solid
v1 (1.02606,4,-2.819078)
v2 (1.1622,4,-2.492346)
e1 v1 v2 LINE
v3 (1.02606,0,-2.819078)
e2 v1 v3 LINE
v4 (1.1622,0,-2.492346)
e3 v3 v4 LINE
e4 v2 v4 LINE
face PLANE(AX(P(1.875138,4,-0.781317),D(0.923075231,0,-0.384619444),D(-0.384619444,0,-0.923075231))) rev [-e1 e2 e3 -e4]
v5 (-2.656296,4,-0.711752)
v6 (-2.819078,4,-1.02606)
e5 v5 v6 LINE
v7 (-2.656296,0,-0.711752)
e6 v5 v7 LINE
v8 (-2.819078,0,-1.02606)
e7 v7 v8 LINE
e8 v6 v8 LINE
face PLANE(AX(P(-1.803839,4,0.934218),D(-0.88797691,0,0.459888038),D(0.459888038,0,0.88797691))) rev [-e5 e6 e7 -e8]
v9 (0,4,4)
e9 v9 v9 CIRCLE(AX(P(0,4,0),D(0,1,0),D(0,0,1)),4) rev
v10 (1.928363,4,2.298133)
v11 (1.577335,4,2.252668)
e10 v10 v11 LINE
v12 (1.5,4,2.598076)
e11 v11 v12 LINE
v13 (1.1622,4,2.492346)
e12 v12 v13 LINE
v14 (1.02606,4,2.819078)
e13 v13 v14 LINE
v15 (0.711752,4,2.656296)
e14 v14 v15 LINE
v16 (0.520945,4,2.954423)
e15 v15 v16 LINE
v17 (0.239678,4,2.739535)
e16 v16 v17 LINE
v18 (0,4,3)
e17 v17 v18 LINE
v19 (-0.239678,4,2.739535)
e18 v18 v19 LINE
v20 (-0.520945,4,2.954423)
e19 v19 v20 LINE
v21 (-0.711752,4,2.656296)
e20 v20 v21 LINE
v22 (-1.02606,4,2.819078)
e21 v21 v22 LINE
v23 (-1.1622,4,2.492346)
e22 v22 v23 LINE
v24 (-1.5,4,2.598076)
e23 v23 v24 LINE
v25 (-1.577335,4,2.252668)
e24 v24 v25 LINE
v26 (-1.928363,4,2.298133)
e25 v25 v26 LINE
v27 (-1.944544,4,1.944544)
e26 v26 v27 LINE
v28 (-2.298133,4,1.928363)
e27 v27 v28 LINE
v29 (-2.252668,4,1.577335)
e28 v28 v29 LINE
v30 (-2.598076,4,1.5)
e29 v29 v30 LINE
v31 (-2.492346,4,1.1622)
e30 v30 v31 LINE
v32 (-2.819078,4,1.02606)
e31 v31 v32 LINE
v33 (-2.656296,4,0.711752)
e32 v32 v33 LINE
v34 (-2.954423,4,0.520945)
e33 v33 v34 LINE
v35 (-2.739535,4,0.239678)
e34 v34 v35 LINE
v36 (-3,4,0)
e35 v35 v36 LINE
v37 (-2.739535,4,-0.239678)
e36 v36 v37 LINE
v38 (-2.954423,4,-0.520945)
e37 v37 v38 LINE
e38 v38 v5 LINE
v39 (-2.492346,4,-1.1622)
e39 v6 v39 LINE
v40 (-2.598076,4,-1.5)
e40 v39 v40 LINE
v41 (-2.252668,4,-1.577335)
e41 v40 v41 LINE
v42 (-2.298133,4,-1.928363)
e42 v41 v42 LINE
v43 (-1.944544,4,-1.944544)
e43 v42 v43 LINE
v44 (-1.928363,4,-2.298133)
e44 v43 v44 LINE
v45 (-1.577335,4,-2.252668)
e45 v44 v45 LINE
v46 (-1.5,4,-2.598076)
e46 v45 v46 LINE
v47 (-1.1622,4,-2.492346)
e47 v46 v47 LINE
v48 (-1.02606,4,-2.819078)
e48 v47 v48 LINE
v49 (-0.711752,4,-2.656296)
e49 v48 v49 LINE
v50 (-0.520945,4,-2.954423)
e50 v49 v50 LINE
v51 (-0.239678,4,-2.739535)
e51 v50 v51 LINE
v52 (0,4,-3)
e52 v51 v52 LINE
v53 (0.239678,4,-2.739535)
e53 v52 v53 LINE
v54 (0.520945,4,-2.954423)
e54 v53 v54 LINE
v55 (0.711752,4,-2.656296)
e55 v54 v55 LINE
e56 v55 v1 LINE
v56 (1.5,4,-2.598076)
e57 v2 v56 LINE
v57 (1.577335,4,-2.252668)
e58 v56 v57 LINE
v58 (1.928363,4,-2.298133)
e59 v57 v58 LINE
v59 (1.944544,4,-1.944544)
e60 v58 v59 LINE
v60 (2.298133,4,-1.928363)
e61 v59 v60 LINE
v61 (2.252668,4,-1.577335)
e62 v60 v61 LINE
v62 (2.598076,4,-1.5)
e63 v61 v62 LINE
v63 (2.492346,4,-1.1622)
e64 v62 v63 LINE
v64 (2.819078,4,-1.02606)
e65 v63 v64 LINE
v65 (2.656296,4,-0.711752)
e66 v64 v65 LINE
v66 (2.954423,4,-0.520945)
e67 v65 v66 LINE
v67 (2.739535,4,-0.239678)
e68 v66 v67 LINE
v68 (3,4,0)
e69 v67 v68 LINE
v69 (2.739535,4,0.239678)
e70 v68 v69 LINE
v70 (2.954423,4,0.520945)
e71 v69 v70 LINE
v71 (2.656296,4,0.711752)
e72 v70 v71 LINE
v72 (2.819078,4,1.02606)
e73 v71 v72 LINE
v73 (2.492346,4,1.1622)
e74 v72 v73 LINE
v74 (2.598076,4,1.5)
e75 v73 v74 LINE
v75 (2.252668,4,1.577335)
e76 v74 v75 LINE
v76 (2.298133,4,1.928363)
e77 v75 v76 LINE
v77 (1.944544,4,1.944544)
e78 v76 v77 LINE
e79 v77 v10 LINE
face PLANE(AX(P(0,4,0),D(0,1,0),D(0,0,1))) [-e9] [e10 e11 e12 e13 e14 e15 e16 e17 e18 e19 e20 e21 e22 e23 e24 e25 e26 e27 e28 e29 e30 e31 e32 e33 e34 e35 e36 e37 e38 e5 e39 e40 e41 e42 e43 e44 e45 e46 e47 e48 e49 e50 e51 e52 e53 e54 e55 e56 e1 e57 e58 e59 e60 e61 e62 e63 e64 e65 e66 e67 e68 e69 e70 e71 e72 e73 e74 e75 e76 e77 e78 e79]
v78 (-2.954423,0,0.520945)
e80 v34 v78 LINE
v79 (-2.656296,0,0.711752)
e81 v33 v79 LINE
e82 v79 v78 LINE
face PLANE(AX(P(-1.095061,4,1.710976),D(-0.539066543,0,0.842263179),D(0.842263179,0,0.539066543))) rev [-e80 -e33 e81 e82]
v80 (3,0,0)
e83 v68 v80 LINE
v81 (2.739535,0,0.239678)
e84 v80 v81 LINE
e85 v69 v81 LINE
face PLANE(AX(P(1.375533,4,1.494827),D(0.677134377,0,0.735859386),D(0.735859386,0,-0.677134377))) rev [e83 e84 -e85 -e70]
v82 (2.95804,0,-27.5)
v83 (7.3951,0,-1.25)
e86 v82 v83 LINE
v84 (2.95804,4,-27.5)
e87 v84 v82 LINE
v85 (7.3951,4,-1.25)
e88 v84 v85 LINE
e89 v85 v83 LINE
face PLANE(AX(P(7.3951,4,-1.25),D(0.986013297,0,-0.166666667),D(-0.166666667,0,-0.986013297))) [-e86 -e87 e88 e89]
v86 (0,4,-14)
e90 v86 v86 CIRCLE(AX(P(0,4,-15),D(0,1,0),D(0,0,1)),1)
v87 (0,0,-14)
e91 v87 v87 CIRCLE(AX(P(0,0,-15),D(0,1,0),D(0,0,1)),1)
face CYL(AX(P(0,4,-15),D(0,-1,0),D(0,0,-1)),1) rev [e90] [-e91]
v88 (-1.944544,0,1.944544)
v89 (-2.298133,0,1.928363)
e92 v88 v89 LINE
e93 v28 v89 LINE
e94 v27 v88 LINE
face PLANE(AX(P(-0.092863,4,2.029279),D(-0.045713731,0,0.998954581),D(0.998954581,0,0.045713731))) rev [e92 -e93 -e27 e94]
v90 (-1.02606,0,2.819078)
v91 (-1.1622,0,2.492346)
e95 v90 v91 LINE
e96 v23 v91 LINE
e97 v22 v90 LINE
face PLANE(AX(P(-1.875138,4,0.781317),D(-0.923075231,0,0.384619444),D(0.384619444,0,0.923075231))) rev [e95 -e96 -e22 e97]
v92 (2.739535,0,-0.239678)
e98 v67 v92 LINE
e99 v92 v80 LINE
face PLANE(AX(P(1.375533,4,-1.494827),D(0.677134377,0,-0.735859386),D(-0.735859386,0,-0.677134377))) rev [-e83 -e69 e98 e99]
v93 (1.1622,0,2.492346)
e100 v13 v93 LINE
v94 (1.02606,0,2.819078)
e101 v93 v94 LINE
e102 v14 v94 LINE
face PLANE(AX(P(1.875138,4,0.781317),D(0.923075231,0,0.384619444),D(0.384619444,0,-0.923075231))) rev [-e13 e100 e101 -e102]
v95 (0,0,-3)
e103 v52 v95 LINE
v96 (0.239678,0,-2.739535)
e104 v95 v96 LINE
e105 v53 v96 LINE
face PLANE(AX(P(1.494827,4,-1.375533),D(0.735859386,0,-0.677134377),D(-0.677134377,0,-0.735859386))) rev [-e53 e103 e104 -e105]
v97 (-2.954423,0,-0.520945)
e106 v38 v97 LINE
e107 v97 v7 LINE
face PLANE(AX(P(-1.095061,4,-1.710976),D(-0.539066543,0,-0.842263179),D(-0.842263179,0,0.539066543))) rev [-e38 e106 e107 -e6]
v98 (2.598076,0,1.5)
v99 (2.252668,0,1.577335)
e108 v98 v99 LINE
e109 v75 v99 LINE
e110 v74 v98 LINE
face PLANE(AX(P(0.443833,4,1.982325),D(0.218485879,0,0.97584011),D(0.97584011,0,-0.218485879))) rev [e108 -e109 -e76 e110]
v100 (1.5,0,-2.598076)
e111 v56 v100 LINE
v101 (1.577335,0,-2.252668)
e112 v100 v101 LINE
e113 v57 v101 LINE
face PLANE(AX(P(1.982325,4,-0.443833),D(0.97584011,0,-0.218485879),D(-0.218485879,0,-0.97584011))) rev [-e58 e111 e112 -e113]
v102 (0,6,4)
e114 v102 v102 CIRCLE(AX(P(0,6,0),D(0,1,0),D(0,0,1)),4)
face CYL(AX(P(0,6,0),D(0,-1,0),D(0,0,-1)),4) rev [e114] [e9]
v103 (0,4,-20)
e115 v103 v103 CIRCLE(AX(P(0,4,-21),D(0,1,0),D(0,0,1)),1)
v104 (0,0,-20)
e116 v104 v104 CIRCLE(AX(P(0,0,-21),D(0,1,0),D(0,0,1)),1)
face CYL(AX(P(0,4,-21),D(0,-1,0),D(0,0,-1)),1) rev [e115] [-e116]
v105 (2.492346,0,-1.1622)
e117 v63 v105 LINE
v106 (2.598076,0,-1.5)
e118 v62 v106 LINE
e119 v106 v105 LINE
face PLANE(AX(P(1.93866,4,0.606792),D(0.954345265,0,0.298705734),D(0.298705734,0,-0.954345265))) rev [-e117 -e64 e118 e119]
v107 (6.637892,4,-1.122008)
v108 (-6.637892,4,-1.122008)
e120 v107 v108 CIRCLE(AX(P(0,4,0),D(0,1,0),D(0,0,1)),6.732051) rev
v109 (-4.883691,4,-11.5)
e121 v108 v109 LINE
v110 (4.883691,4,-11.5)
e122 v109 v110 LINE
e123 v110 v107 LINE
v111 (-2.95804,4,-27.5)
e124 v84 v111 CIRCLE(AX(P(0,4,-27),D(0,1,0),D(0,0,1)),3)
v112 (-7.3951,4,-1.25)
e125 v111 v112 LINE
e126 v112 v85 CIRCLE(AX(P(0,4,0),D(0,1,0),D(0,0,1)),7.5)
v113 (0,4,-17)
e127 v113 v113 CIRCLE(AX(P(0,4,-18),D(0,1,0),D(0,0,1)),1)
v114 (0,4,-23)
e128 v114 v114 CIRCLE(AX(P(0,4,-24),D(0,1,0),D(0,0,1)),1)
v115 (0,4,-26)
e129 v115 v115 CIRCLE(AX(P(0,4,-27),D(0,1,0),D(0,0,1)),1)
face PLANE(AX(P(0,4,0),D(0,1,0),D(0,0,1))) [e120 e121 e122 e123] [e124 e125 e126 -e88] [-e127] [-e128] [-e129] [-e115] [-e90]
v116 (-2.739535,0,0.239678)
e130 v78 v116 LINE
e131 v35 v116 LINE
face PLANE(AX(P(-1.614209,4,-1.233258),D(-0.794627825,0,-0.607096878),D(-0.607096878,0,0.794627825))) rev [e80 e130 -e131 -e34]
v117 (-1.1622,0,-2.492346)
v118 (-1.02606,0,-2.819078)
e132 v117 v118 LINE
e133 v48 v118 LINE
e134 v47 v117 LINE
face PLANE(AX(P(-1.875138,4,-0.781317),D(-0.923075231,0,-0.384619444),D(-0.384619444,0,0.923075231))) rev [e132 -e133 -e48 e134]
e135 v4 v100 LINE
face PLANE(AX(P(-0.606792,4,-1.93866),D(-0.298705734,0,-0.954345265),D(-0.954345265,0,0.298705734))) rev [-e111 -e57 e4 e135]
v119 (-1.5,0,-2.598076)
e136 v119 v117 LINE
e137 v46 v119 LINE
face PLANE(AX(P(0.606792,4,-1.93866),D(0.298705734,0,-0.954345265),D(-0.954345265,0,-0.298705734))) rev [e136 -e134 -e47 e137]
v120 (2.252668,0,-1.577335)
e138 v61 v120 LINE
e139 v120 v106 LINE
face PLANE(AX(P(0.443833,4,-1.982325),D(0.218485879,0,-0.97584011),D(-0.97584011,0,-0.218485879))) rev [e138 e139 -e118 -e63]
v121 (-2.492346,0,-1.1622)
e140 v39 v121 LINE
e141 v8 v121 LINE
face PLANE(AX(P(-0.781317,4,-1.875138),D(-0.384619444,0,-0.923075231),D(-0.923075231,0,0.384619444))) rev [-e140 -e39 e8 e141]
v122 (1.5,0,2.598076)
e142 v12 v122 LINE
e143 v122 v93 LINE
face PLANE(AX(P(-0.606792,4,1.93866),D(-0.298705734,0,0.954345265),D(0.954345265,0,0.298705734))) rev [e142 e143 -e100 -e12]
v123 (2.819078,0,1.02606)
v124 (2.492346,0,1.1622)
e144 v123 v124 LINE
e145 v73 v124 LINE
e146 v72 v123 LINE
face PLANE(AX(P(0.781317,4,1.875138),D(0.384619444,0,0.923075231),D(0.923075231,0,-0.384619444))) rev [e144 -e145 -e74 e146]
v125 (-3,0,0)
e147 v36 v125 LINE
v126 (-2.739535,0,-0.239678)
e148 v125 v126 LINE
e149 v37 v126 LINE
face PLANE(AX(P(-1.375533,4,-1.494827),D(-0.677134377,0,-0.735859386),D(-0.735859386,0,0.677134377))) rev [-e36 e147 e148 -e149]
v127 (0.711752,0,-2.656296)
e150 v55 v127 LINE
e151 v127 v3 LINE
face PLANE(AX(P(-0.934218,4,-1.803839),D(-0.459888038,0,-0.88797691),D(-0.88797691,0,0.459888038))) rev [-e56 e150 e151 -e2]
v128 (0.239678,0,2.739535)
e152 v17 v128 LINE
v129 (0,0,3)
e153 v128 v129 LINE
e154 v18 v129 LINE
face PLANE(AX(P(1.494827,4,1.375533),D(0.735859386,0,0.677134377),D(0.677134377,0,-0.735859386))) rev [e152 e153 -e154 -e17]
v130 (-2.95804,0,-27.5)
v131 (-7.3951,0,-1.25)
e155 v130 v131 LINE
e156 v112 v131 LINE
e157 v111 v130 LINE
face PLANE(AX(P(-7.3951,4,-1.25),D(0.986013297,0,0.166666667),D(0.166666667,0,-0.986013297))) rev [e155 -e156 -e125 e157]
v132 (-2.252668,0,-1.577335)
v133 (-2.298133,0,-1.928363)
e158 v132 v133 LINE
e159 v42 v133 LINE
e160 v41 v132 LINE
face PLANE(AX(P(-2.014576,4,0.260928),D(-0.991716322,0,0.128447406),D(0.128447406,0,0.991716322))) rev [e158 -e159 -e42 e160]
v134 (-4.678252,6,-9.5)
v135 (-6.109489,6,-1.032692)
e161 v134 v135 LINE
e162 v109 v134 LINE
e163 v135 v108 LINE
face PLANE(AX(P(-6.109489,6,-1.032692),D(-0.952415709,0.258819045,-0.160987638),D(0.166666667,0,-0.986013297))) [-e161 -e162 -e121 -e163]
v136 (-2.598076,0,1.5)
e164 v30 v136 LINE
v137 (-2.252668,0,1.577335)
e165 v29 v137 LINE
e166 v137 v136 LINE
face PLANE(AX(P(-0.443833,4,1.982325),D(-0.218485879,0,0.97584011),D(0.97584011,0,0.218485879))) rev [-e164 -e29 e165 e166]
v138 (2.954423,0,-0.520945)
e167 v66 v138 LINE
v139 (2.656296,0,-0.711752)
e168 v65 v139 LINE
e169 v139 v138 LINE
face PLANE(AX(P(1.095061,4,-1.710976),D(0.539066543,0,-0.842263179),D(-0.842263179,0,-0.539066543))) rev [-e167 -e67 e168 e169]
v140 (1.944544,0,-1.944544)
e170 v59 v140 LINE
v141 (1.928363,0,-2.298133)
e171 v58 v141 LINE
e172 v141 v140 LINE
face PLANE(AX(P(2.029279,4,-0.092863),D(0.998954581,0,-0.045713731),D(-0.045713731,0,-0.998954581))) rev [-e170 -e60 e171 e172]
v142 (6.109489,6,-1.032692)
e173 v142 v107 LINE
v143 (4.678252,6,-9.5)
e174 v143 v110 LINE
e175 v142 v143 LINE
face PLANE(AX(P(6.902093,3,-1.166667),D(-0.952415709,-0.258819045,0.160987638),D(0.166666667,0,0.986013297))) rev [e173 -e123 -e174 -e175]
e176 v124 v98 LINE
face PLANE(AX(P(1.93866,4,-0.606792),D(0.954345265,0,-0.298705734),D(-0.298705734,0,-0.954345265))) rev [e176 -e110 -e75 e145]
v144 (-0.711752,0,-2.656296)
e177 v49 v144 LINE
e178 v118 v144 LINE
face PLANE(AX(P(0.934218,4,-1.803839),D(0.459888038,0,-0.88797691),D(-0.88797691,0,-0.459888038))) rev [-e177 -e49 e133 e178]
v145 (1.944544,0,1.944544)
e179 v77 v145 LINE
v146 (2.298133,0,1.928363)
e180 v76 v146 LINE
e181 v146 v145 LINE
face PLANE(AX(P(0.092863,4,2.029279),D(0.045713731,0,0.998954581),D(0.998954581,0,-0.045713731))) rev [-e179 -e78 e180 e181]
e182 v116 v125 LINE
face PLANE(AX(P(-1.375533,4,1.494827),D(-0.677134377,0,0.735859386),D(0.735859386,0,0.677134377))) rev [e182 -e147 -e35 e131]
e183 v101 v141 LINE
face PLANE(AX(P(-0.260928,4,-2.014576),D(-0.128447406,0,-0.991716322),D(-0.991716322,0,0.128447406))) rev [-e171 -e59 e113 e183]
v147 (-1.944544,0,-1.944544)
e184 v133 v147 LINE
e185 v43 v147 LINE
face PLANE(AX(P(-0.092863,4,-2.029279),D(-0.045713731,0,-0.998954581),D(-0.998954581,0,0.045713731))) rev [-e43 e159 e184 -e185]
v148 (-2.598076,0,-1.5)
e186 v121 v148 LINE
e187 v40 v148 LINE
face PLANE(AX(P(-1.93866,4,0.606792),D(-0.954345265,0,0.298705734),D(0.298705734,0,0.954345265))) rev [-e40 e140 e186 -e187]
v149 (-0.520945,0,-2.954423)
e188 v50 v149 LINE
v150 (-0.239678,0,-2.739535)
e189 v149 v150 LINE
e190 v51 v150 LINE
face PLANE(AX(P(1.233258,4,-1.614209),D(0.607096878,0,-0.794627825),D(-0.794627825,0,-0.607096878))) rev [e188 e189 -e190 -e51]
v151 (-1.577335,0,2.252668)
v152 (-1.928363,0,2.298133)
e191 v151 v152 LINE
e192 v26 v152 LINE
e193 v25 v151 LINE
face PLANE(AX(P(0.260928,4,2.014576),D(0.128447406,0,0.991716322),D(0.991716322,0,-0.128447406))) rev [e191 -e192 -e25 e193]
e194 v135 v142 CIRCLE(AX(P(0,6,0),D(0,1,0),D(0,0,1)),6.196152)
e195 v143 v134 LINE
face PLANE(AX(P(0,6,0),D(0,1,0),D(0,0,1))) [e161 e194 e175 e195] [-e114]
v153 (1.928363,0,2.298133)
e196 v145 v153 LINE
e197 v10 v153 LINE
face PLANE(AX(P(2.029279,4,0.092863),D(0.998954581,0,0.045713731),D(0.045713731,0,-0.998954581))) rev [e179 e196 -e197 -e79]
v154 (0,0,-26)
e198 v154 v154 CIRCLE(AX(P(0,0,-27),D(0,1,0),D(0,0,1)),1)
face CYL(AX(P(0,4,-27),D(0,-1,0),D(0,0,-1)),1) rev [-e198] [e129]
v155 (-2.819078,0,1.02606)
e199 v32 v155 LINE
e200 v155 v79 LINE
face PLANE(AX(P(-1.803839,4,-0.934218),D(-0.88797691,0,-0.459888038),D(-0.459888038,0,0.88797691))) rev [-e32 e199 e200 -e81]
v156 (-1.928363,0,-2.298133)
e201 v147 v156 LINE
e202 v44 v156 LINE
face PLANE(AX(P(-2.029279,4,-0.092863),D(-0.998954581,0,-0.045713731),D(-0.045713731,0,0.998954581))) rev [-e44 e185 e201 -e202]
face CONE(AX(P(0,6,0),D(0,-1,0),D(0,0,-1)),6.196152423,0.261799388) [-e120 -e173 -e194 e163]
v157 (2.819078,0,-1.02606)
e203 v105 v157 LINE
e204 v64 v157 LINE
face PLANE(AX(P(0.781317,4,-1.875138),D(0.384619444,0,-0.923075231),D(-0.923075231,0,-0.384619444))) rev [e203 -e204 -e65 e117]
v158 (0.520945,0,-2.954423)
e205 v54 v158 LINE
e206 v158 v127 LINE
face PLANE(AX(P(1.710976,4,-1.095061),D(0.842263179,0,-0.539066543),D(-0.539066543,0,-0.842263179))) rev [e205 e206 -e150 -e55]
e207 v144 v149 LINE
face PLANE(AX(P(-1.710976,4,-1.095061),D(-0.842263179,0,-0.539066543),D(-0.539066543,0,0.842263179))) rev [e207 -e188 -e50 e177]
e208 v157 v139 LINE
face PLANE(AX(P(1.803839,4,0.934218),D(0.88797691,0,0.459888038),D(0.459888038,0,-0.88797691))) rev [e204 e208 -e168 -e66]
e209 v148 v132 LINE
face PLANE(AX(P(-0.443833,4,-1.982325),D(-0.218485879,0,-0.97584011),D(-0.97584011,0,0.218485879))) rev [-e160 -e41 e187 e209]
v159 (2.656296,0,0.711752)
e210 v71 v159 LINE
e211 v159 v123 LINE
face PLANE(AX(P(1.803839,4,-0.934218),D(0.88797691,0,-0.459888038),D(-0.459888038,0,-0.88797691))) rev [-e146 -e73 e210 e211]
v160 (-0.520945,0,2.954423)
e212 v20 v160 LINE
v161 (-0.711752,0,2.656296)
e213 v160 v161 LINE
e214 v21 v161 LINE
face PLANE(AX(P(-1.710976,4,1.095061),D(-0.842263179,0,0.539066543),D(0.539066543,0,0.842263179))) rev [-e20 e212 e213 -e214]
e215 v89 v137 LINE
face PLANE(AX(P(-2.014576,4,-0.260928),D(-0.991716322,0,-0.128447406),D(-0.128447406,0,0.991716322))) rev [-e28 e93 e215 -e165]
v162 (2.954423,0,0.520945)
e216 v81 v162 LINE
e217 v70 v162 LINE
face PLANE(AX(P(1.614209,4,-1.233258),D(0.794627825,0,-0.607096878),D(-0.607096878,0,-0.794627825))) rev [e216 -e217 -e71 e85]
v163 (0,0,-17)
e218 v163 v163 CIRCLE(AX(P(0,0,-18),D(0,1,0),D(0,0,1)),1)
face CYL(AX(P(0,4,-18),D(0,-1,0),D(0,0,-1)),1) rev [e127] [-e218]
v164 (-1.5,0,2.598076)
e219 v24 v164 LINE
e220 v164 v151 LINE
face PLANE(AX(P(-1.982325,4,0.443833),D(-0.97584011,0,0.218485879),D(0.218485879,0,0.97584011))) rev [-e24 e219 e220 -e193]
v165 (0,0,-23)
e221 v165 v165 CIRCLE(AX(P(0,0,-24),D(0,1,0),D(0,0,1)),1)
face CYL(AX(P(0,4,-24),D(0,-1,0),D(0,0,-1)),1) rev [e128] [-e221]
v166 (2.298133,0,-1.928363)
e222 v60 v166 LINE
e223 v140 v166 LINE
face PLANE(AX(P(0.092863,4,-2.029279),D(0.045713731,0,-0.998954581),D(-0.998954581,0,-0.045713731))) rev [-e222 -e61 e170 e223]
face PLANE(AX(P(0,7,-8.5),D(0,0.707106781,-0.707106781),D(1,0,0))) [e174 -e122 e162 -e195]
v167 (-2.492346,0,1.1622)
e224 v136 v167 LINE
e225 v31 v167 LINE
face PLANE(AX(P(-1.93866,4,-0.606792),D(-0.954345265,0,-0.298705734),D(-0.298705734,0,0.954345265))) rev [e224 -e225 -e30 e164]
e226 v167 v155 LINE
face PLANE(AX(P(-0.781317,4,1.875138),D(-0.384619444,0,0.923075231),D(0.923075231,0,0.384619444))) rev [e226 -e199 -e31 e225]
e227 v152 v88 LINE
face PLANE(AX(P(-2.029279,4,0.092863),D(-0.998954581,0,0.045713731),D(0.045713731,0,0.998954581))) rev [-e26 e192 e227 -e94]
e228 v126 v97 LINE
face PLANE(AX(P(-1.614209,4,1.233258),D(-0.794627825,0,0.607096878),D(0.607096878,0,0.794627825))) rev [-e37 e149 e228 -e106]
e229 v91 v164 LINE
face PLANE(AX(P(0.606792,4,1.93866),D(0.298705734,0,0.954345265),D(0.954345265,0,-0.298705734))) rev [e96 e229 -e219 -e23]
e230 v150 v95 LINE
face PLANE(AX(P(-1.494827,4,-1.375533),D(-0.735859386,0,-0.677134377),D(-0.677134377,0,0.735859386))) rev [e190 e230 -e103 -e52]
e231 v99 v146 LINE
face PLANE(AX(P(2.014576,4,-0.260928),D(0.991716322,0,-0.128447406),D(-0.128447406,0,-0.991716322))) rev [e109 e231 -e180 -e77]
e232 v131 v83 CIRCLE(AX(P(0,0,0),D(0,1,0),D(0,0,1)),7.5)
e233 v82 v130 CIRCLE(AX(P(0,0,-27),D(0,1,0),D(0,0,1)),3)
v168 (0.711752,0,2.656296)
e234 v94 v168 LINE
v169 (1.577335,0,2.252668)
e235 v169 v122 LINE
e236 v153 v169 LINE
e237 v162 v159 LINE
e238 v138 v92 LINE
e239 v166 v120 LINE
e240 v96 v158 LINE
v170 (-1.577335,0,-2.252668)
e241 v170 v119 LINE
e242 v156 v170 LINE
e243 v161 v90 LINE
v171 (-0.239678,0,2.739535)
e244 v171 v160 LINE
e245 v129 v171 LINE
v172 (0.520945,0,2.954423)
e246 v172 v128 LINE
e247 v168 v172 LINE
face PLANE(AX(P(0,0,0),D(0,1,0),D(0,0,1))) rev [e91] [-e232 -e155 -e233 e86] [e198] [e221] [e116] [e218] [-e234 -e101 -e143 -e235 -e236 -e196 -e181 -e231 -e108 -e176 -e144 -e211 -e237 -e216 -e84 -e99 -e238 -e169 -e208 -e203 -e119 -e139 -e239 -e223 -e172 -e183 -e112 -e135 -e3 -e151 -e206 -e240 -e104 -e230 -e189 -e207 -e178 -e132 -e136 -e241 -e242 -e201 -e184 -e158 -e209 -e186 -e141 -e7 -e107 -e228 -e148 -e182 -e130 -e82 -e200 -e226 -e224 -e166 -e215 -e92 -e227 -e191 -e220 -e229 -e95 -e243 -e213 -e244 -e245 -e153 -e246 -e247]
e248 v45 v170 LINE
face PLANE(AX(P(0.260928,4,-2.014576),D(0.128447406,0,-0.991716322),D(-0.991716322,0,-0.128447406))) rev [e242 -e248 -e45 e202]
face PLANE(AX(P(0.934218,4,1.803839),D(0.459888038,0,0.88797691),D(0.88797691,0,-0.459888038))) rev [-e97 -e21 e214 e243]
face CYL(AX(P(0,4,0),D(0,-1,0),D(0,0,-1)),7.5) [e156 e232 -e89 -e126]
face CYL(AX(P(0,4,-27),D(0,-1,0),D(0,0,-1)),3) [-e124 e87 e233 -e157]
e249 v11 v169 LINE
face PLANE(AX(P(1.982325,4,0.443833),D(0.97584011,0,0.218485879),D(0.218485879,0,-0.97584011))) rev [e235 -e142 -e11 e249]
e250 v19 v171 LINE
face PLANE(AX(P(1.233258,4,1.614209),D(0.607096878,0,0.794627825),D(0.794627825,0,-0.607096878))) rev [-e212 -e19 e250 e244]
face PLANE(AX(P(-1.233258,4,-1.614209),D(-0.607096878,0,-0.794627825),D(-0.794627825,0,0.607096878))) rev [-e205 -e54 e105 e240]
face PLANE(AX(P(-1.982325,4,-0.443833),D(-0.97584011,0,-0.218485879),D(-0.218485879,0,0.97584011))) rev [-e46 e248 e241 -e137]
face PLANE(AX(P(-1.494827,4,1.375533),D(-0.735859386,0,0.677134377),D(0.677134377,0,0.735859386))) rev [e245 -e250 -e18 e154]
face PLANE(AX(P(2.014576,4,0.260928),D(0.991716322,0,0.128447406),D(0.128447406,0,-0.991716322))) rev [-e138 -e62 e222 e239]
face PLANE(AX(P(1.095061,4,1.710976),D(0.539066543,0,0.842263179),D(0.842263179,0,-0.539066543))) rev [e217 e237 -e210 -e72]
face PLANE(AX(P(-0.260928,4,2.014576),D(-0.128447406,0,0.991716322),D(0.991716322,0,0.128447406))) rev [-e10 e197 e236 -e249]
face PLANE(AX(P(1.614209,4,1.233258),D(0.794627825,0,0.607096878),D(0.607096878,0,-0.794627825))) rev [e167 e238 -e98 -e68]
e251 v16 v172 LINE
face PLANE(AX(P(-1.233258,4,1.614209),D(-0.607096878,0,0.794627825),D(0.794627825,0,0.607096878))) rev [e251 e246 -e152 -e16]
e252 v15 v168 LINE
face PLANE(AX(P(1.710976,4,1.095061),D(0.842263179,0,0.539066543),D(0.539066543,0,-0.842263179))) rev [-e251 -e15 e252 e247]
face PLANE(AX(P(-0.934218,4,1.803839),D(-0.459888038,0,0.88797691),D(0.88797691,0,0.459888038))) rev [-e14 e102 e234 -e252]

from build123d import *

# Parameters (mm, degrees)
CROQUIS1_R              = 1
SALIENTE_EXTRUIR1_DEPTH = 4
CROQUIS1_3_R            = 7
CROQUIS1_3_R_2          = 4
SALIENTE_EXTRUIR2_DEPTH = 6
CHAFL_N1_SIZE           = 3
CHAFL_N2_SIZE           = 3
CHAFL_N2_SIZE_2         = 0.803847577
SALIENTE_EXTRUIR3_DEPTH = 4
MATRIZC1_COUNT          = 36


with BuildPart() as part:
    # Croquis1 → Saliente-Extruir1 (new body)
    with BuildSketch(Plane(origin=(0, 0, 0), x_dir=(1, 0, 0), z_dir=(0, 1, 0))):
        with BuildLine():
            ThreePointArc((-7.395099729, 1.25), (0, -7.5), (7.395099729, 1.25))
            Line((7.395099729, 1.25), (2.958039892, 27.5))
            ThreePointArc((2.958039892, 27.5), (0, 30), (-2.958039892, 27.5))
            Line((-2.958039892, 27.5), (-7.395099729, 1.25))
        make_face()
        with Locations(Location((0, 24, 0), (0, 0, 270))):
            Circle(CROQUIS1_R, mode=Mode.SUBTRACT)
        with Locations(Location((0, 15, 0), (0, 0, 270))):
            Circle(CROQUIS1_R, mode=Mode.SUBTRACT)
        with Locations(Location((0, 18, 0), (0, 0, 270))):
            Circle(CROQUIS1_R, mode=Mode.SUBTRACT)
        with Locations(Location((0, 21, 0), (0, 0, 270))):
            Circle(CROQUIS1_R, mode=Mode.SUBTRACT)
        with Locations(Location((0, 27, 0), (0, 0, 270))):
            Circle(CROQUIS1_R, mode=Mode.SUBTRACT)
        with BuildLine():
            ThreePointArc((-2.988584094, 0.261467228), (-2.974334584, 0.391578577), (-2.954423259, 0.520944533))
            ThreePointArc((-2.954423259, 0.520944533), (2.974334584, -0.391578577), (-2.988584094, 0.261467228))
        make_face(mode=Mode.SUBTRACT)
    extrude(amount=SALIENTE_EXTRUIR1_DEPTH)

    # Croquis1<3> → Saliente-Extruir2 (add)
    # profile 1 of 3: a face of its own
    with BuildSketch(Plane(origin=(0, 0, 0), x_dir=(1, 0, 0), z_dir=(0, 1, 0))):
        with BuildLine():
            ThreePointArc((6.453329346, 3.82158872), (0, 7.5), (-6.453329346, 3.82158872))
            Line((-6.453329346, 3.82158872), (-6.90209308, 1.166666667))
            ThreePointArc((-6.90209308, 1.166666667), (0, 7), (6.90209308, 1.166666667))
            Line((6.90209308, 1.166666667), (6.453329346, 3.82158872))
        make_face()
    # profile 2 of 3: a face of its own
    with BuildSketch(Plane(origin=(0, 0, 0), x_dir=(1, 0, 0), z_dir=(0, 1, 0))):
        with BuildLine():
            Line((-5.662533507, 8.5), (-6.453329346, 3.82158872))
            ThreePointArc((-6.453329346, 3.82158872), (0, 7.5), (6.453329346, 3.82158872))
            Line((6.453329346, 3.82158872), (5.662533507, 8.5))
            Line((5.662533507, 8.5), (-5.662533507, 8.5))
        make_face()
    # profile 3 of 3: a face of its own
    with BuildSketch(Plane(origin=(0, 0, 0), x_dir=(1, 0, 0), z_dir=(0, 1, 0))):
        Circle(CROQUIS1_3_R)
        with Locations(Location((0, 0, 0), (0, 0, 270))):
            Circle(CROQUIS1_3_R_2, mode=Mode.SUBTRACT)
    extrude(amount=SALIENTE_EXTRUIR2_DEPTH)

    # Chaflán1
    # the kernel refuses this chamfer: 3 mm, written as the material it adds along each edge
    with BuildSketch(Plane(origin=(-13.377582471, 4, -8.5), x_dir=(0, -0.02749587661058635, -0.9996219169112968), z_dir=(1, 0, 0))) as chafl_n1_piece_1_section:
        Polygon((CHAFL_N1_SIZE * 0.999621916911, CHAFL_N1_SIZE * 0.0274958766106), (-CHAFL_N1_SIZE * 0.0274958766106, CHAFL_N1_SIZE * 0.999621916911), (0, 0), align=None)
    chafl_n1_piece_1 = extrude(amount=26.755164941, mode=Mode.PRIVATE)
    chafl_n1_piece_1 = split(chafl_n1_piece_1, bisect_by=Plane(origin=(5.328597363, 4.798690402, -10.475592868), z_dir=(-0.9860132971832695, 0, 0.16666666666666669)), keep=Keep.TOP, mode=Mode.PRIVATE)
    chafl_n1_piece_1 = split(chafl_n1_piece_1, bisect_by=Plane(origin=(-5.328597363, 4.798690402, -10.475592868), z_dir=(0.9860132971832695, 0, 0.16666666666666669)), keep=Keep.TOP, mode=Mode.PRIVATE)
    chafl_n1_piece_1 = split(chafl_n1_piece_1, bisect_by=Plane(origin=(0, 6, -9.574895522), z_dir=(0, -1, 0)), keep=Keep.TOP, mode=Mode.PRIVATE)
    add(chafl_n1_piece_1)

    # Chaflán2
    # the kernel refuses this chamfer: 3, 0.803847577 mm, written as the material it takes off along each edge
    with BuildSketch(Plane(origin=(6.90209308, 6, -1.166666667), x_dir=(0.00982773906125155, -0.9999503267608272, -0.0016611910963950731), z_dir=(-0.1666666666666078, 0, -0.9860132971832793))) as chafl_n2_piece_1_section:
        Polygon((CHAFL_N2_SIZE * 0.999950326761, CHAFL_N2_SIZE * 0.00996714657715), (-CHAFL_N2_SIZE_2 * 0.00996714658201, CHAFL_N2_SIZE_2 * 0.999950327126), (0, 0), align=None)
    chafl_n2_piece_1 = extrude(amount=16.241707258, mode=Mode.PRIVATE)
    chafl_n2_piece_1 = split(chafl_n2_piece_1, bisect_by=Plane(origin=(5.281191702, 4, -9.128733123), z_dir=(0, 1, 0)), keep=Keep.TOP, mode=Mode.PRIVATE)
    add(chafl_n2_piece_1, mode=Mode.SUBTRACT)
    with BuildSketch(Plane(origin=(-6.90209308, 6, -1.166666667), x_dir=(0.976646209142954, 0.13751244702122697, 0.16508333980426884), z_dir=(0.1666666666666078, 0, -0.9860132971832793))) as chafl_n2_piece_2_section:
        Polygon((CHAFL_N2_SIZE_2 * 0.990500039187, CHAFL_N2_SIZE_2 * 0.137512447071), (-CHAFL_N2_SIZE * 0.137512447022, CHAFL_N2_SIZE * 0.990500038826), (0, 0), align=None)
    chafl_n2_piece_2 = extrude(amount=16.241707258, mode=Mode.PRIVATE)
    chafl_n2_piece_2 = split(chafl_n2_piece_2, bisect_by=Plane(origin=(-5.281191702, 4, -9.128733123), z_dir=(0, 1, 0)), keep=Keep.TOP, mode=Mode.PRIVATE)
    add(chafl_n2_piece_2, mode=Mode.SUBTRACT)
    with BuildSketch(Plane(origin=(0, 6, 0), x_dir=(0.9860132971832691, 0, -0.16666666666666757), z_dir=(-0.16666666666666757, 0, -0.9860132971832691))) as chafl_n2_piece_3_section:
        Polygon((7, CHAFL_N2_SIZE), (7 - CHAFL_N2_SIZE_2, 0), (7, 0), align=None)
    chafl_n2_piece_3 = revolve(axis=Axis((0, 6, 0), (0, -1, 0)), revolution_arc=199.188136454, mode=Mode.PRIVATE)
    chafl_n2_piece_3 = split(chafl_n2_piece_3, bisect_by=Plane(origin=(0, 4, 6.478370391), z_dir=(0, 1, 0)), keep=Keep.TOP, mode=Mode.PRIVATE)
    add(chafl_n2_piece_3, mode=Mode.SUBTRACT)

    # Croquis1<4> → Saliente-Extruir3 (add)
    with BuildSketch(Plane(origin=(0, 0, 0), x_dir=(1, 0, 0), z_dir=(0, 1, 0))):
        with BuildLine():
            Line((-3, 0), (-2.73953542, 0.239678293))
            Line((-2.73953542, 0.239678293), (-2.988584094, 0.261467228))
            ThreePointArc((-2.988584094, 0.261467228), (-2.997144665, 0.130858162), (-3, 0))
        make_face()
        with BuildLine():
            Line((-2.988584094, 0.261467228), (-2.73953542, 0.239678293))
            Line((-2.73953542, 0.239678293), (-2.954423259, 0.520944533))
            ThreePointArc((-2.954423259, 0.520944533), (-2.974334584, 0.391578577), (-2.988584094, 0.261467228))
        make_face()
    saliente_extruir3 = extrude(amount=SALIENTE_EXTRUIR3_DEPTH)

    # MatrizC1: Saliente-Extruir3 ×36 about axis
    matrizc1_axis = Axis((0, 0, 0), (0, 1, 0))
    for i in range(1, MATRIZC1_COUNT):
        add(saliente_extruir3.rotate(matrizc1_axis, i * 360 / MATRIZC1_COUNT))


solid = part.part
